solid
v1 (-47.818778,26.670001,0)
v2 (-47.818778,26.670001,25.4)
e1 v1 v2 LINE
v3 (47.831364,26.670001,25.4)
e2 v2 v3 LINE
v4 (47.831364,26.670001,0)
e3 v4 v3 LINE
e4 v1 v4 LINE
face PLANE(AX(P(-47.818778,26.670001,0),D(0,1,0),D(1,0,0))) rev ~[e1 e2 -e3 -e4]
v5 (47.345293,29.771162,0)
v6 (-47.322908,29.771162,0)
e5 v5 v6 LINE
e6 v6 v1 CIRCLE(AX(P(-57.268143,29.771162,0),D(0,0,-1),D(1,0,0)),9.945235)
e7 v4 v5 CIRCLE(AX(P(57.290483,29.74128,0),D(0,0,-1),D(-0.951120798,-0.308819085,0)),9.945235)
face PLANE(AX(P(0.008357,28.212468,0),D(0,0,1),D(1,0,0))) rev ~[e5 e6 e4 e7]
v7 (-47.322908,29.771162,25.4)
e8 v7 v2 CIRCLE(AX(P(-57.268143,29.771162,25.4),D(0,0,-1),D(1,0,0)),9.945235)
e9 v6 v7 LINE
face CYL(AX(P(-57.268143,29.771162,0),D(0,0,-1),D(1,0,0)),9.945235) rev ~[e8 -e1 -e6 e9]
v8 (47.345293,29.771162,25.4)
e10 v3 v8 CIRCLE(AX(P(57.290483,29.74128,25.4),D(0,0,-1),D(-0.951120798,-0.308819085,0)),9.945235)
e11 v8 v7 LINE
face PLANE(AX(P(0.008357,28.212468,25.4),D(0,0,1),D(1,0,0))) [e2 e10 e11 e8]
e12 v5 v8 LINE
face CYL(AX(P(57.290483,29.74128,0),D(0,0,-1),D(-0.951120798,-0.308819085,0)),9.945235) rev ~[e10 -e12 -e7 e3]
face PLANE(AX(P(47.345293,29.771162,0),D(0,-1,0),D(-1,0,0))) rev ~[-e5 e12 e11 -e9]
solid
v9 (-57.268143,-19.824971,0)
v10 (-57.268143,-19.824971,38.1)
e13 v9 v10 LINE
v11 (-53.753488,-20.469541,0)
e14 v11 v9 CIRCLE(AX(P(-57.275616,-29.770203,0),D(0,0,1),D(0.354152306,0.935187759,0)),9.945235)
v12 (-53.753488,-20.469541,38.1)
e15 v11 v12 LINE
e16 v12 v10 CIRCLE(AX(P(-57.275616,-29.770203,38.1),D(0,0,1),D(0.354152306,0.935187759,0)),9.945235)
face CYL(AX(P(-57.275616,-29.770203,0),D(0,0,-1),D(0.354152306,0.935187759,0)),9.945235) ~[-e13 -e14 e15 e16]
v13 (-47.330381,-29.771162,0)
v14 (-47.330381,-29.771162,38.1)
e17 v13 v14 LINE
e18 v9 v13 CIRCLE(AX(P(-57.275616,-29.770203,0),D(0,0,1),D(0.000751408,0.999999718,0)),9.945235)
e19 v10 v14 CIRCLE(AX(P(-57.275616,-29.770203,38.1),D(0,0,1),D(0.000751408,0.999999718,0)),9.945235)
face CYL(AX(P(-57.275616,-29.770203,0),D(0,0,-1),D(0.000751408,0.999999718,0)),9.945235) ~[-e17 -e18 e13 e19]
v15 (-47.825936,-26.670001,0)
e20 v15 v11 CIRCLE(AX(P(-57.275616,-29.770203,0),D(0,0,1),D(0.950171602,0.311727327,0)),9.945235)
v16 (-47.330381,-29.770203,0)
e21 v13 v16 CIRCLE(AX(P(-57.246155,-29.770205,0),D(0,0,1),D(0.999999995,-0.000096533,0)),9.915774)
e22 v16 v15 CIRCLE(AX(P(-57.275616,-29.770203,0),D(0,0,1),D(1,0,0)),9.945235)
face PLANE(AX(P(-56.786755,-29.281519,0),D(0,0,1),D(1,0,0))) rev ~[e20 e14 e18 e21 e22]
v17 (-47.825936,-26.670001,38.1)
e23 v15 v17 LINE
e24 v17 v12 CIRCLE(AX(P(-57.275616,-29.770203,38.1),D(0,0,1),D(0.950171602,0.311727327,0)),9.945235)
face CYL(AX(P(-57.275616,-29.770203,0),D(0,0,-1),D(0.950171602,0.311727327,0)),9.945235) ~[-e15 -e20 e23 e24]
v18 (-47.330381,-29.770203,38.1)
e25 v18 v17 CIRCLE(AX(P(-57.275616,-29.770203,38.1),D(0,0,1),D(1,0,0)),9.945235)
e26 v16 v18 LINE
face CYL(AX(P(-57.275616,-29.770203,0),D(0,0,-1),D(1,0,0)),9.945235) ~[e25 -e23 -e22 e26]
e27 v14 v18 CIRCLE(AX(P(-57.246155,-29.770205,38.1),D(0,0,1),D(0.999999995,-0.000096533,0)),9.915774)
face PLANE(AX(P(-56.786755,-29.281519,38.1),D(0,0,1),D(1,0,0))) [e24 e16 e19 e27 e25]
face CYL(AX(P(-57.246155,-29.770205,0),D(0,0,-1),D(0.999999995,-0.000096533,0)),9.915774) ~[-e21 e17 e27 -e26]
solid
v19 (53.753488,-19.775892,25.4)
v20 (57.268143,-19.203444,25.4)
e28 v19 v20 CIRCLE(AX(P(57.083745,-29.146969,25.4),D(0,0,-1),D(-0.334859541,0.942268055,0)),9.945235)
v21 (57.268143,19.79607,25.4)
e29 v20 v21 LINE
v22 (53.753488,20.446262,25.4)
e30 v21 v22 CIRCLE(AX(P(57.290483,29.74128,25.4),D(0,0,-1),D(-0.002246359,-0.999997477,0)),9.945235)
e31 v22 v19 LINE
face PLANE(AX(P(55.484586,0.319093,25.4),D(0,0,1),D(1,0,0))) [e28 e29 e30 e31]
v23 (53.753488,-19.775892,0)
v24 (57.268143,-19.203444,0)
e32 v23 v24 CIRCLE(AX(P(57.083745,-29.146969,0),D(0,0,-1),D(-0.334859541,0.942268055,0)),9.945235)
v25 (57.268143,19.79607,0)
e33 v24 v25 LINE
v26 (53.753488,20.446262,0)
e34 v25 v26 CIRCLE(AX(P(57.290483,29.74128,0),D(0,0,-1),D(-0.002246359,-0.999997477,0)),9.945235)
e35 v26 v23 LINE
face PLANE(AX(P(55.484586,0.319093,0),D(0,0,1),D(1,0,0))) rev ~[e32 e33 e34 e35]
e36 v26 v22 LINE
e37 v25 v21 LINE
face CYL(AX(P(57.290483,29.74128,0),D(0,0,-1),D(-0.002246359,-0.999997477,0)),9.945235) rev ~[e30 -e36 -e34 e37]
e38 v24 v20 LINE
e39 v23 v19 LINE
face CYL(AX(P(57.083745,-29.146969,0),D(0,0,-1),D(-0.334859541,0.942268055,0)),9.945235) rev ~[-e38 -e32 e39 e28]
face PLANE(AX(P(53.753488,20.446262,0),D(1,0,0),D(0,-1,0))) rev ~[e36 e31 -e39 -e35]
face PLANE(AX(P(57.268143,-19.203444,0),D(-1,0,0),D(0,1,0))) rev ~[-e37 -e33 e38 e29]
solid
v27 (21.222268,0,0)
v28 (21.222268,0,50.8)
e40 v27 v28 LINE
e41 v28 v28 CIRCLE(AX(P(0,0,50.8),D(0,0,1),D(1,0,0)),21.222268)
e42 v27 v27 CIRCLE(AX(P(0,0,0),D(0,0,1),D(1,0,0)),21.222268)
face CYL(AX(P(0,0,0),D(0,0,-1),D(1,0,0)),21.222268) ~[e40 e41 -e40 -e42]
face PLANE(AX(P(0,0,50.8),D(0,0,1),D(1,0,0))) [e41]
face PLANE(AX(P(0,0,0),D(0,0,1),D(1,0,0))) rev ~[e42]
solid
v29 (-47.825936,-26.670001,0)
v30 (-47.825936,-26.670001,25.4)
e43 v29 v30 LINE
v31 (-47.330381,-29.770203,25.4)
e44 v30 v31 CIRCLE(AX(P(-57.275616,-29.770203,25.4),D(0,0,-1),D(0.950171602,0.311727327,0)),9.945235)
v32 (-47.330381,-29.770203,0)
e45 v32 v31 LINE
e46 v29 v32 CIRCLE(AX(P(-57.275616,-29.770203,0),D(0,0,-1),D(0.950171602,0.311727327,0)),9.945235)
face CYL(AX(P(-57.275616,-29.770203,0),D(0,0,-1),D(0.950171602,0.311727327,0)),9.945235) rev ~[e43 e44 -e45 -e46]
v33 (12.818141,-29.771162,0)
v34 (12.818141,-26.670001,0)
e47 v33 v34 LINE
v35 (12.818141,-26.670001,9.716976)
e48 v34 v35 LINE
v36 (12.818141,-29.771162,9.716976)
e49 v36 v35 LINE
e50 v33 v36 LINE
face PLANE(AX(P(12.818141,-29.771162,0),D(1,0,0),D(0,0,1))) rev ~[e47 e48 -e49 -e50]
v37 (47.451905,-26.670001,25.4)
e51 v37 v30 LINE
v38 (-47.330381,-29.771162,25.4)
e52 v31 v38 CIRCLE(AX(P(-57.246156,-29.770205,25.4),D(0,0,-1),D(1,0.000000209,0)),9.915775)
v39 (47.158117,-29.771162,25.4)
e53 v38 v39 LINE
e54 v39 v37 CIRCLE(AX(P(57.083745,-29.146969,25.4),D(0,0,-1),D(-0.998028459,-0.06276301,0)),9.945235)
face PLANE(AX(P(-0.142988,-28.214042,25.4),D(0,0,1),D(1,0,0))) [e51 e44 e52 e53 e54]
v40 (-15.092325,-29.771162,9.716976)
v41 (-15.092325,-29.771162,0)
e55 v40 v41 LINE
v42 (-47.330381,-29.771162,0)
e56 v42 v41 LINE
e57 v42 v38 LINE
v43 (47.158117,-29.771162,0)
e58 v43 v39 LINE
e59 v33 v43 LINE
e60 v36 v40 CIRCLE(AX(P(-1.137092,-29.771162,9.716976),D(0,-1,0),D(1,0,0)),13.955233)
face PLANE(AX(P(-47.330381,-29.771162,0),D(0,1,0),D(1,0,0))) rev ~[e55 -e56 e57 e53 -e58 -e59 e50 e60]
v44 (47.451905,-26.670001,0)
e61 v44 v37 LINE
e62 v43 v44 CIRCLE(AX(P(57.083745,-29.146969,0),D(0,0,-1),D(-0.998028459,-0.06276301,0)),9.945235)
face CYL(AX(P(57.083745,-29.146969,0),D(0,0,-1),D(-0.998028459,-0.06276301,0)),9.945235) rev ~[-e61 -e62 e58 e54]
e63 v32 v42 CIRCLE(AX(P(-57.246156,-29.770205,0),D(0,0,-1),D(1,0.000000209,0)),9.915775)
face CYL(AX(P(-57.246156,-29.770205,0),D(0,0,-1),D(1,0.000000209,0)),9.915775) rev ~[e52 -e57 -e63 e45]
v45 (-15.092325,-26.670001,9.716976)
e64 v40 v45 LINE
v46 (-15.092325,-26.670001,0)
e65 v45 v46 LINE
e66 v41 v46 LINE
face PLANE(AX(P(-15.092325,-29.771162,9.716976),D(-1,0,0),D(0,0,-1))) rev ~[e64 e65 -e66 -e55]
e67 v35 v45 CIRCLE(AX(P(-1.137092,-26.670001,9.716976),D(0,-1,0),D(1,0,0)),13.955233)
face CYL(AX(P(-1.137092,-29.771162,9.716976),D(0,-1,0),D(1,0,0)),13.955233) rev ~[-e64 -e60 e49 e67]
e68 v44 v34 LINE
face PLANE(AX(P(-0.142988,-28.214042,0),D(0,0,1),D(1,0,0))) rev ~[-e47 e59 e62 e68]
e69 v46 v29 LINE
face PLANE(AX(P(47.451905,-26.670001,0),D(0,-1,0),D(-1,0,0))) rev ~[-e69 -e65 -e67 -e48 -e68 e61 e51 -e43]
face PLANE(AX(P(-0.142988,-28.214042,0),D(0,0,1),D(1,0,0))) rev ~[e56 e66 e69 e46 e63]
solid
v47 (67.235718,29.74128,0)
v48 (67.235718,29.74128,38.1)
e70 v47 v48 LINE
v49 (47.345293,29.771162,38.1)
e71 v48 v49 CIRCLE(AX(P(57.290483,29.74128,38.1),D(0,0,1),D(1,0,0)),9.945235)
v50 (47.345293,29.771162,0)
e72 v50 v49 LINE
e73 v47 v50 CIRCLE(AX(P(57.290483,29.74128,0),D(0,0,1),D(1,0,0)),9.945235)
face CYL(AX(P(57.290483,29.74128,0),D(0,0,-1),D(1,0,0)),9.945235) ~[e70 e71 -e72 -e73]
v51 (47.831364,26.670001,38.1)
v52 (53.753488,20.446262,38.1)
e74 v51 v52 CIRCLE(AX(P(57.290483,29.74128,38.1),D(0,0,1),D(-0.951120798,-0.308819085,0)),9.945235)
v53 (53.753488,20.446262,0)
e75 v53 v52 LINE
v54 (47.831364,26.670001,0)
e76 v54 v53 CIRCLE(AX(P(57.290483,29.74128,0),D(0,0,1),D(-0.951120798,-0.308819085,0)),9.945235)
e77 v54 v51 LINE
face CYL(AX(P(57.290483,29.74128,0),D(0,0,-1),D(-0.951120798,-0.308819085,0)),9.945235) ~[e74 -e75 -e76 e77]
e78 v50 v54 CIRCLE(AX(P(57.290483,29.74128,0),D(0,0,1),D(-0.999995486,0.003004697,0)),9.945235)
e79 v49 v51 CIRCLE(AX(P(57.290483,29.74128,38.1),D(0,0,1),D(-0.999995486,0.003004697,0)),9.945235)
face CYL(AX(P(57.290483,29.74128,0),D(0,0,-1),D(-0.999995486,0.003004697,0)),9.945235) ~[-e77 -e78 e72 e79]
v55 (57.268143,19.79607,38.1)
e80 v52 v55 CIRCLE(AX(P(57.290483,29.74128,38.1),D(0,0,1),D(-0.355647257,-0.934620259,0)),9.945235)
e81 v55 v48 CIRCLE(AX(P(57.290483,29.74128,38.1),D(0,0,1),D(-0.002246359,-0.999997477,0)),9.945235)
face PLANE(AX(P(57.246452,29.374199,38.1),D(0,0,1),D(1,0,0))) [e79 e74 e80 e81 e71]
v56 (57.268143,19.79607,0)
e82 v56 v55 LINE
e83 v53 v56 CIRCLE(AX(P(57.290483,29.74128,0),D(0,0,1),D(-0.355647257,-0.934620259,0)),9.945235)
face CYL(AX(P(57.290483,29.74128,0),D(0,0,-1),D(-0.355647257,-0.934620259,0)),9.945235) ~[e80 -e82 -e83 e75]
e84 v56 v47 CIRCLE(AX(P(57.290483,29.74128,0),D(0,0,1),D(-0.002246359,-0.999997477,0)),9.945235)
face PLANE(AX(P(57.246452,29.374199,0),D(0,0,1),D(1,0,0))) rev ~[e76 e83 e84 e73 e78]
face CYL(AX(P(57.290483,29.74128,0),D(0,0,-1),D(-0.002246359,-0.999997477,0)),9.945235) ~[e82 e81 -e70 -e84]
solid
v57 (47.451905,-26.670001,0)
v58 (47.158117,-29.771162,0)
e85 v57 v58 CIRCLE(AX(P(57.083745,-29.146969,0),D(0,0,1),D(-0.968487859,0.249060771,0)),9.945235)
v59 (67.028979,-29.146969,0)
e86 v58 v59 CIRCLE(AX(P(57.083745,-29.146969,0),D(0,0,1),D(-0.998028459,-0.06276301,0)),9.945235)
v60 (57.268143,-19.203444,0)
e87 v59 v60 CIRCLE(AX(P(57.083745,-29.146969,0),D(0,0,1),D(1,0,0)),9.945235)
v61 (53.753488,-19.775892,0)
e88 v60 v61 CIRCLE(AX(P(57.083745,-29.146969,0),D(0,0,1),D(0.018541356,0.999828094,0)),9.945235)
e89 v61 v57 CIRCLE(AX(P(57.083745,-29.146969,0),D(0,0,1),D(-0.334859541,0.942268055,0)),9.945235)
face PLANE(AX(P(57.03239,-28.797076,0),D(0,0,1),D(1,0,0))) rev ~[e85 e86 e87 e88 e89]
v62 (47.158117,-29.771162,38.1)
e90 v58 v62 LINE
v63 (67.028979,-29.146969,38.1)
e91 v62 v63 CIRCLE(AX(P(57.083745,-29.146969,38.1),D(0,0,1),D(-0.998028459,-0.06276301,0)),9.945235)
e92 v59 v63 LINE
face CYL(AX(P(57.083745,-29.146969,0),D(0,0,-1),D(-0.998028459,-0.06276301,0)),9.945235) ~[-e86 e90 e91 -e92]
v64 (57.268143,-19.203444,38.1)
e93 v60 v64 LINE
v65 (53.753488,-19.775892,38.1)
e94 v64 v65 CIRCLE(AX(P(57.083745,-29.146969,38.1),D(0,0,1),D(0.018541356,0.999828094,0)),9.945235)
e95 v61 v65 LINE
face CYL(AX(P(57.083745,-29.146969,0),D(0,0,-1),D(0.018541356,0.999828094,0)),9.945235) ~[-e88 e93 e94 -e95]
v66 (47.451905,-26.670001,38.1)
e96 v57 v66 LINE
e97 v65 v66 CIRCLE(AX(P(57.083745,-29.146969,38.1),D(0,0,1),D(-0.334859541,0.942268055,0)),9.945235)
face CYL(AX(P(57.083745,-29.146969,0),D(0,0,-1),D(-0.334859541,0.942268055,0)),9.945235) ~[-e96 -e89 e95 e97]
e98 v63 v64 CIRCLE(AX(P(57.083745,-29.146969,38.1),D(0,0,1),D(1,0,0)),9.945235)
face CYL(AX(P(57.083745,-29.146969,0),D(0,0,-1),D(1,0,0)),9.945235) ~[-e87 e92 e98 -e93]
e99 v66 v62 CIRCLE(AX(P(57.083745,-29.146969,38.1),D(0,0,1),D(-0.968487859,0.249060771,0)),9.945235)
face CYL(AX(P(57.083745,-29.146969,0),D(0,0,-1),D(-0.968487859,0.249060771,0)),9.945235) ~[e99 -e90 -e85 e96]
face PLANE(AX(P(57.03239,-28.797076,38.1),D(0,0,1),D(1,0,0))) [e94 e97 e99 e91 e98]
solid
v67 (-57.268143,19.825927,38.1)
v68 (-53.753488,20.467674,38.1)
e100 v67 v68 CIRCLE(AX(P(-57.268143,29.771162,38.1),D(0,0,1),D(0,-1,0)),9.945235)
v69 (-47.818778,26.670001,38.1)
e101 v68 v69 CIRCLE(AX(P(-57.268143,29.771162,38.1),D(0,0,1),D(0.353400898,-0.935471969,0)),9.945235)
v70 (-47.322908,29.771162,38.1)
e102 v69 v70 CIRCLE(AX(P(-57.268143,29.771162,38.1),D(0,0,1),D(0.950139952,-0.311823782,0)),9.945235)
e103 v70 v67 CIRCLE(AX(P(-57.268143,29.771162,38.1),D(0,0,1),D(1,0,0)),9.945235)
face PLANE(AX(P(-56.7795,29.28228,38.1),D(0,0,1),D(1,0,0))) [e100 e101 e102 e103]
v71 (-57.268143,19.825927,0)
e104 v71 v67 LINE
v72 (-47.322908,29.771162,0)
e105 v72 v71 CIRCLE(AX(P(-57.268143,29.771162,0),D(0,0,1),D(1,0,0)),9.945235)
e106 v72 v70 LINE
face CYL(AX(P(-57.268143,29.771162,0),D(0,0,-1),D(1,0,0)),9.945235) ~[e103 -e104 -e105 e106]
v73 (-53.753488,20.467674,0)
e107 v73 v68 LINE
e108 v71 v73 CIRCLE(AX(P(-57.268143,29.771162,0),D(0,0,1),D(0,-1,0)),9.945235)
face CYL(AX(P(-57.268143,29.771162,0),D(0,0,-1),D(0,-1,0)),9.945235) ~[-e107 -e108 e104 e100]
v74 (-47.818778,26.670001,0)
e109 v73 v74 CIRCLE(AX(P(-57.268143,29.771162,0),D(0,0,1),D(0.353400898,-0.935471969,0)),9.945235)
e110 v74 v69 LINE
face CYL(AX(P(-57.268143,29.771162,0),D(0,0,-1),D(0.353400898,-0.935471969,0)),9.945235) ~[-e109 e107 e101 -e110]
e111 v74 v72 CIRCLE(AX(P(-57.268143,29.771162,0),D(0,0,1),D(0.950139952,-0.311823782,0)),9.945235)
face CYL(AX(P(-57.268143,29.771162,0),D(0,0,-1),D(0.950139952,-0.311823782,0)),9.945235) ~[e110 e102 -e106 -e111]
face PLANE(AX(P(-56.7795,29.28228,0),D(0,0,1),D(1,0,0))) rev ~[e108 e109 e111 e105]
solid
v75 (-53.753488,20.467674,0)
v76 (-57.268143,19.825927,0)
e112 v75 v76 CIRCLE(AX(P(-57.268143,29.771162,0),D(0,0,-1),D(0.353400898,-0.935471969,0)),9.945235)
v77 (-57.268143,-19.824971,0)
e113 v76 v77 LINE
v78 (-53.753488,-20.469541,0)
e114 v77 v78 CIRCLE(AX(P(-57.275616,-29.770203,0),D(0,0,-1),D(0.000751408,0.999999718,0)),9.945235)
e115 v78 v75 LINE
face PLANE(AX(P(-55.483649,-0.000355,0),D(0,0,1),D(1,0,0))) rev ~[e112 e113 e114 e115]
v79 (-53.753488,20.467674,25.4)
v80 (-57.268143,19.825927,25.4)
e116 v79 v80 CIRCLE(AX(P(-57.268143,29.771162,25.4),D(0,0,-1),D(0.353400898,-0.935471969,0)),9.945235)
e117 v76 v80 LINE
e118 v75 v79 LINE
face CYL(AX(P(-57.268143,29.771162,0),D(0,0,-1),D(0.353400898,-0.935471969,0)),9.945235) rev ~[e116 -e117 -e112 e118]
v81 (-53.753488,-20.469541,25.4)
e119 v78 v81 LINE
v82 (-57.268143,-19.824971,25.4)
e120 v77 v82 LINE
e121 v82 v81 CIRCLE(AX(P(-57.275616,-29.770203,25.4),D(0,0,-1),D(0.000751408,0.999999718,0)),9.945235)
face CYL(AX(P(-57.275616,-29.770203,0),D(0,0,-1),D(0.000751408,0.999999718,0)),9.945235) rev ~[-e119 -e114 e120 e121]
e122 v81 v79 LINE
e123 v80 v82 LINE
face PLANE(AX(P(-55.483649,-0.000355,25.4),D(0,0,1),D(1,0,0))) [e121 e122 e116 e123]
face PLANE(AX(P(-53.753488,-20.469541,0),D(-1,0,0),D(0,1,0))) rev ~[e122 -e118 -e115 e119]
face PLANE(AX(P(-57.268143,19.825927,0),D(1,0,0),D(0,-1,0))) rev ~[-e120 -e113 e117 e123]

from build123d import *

# Parameters (mm, degrees)
F1_DEPTH = 25.4
F2_DEPTH = 38.1
F0_R     = 21.2222684157
F3_DEPTH = 50.8
F5_DEPTH = 25.4


# Not quite as in the source:
# - a feature of the source that left no trace in its solid (it failed there, or was rolled back) is left out


with BuildPart() as f1:
    # F0 (on Top) → F1 (new body)
    with BuildSketch(Plane.XY):
        with BuildLine():
            Line((57.2681427002, -19.2034440821), (57.2681427002, 19.7960699943))
            ThreePointArc((57.2681427002, 19.7960699943), (55.4813658991, 19.9619755545), (53.7534877658, 20.4462617803))
            Line((53.7534877658, 20.4462617803), (53.7534877658, -19.7758921918))
            ThreePointArc((53.7534877658, -19.7758921918), (55.4849853919, -19.3310808749), (57.2681427002, -19.2034440821))
        make_face()
    extrude(amount=F1_DEPTH)


with BuildPart() as f1b:
    # F0 (on Top) → F1, piece 2 (new body)
    with BuildSketch(Plane.XY):
        with BuildLine():
            ThreePointArc((-47.3303807535, -29.7702029347), (-47.330380765, -29.7706825659), (-47.3303807997, -29.771162197))
            Line((-47.3303807997, -29.771162197), (47.1581171171, -29.771162197))
            ThreePointArc((47.1581171171, -29.771162197), (47.1828392876, -28.209007874), (47.4519053251, -26.6700014472))
            Line((47.4519053251, -26.6700014472), (-47.8259358741, -26.6700014472))
            ThreePointArc((-47.8259358741, -26.6700014472), (-47.4550509459, -28.2004239582), (-47.3303807535, -29.7702029347))
        make_face()
    extrude(amount=F1_DEPTH)

    # F4 (on face) → F5 (cut)
    with BuildSketch(Plane.XZ.offset(29.771162197)):
        with BuildLine():
            Line((-15.0923253968, 0), (0, 0))
            Line((0, 0), (12.8181409091, 0))
            Line((12.8181409091, 0), (12.8181409091, 9.716976434))
            ThreePointArc((12.8181409091, 9.716976434), (-1.1370922439, 23.6722095869), (-15.0923253968, 9.716976434))
            Line((-15.0923253968, 9.716976434), (-15.0923253968, 0))
        make_face()
    extrude(amount=-F5_DEPTH, mode=Mode.SUBTRACT)


with BuildPart() as f1c:
    # F0 (on Top) → F1, piece 3 (new body)
    with BuildSketch(Plane.XY):
        with BuildLine():
            ThreePointArc((-53.7534877658, 20.4676737388), (-55.4817610377, 19.9876793123), (-57.2681427002, 19.8259273179))
            Line((-57.2681427002, 19.8259273179), (-57.2681427002, -19.8249708633))
            ThreePointArc((-57.2681427002, -19.8249708633), (-55.4816289767, -19.9881117126), (-53.7534877658, -20.469541018))
            Line((-53.7534877658, -20.469541018), (-53.7534877658, 20.4676737388))
        make_face()
    extrude(amount=F1_DEPTH)


with BuildPart() as f1d:
    # F0 (on Top) → F1, piece 4 (new body)
    with BuildSketch(Plane.XY):
        with BuildLine():
            ThreePointArc((47.8313635292, 26.6700014472), (47.4652042143, 28.2012835622), (47.345293281, 29.771162197))
            Line((47.345293281, 29.771162197), (-47.3229078211, 29.771162197))
            ThreePointArc((-47.3229078211, 29.771162197), (-47.4476577038, 28.2008847583), (-47.8187777055, 26.6700014472))
            Line((-47.8187777055, 26.6700014472), (47.8313635292, 26.6700014472))
        make_face()
    extrude(amount=F1_DEPTH)


with BuildPart() as f2:
    # F0 (on Top) → F2 (new body)
    with BuildSketch(Plane.XY):
        with BuildLine():
            ThreePointArc((67.2357181452, 29.7412797809), (57.305424491, 39.6865034364), (47.345293281, 29.771162197))
            ThreePointArc((47.345293281, 29.771162197), (47.4652042143, 28.2012835622), (47.8313635292, 26.6700014472))
            ThreePointArc((47.8313635292, 26.6700014472), (50.0857288168, 22.8856827883), (53.7534877658, 20.4462617803))
            ThreePointArc((53.7534877658, 20.4462617803), (55.4813658991, 19.9619755545), (57.2681427002, 19.7960699943))
            ThreePointArc((57.2681427002, 19.7960699943), (64.314923266, 22.7010426053), (67.2357181452, 29.7412797809))
        make_face()
    extrude(amount=F2_DEPTH)


with BuildPart() as f2b:
    # F0 (on Top) → F2, piece 2 (new body)
    with BuildSketch(Plane.XY):
        with BuildLine():
            ThreePointArc((67.0289794348, -29.1469693184), (64.1809827389, -22.1801259176), (57.2681427002, -19.2034440821))
            ThreePointArc((57.2681427002, -19.2034440821), (55.4849853919, -19.3310808749), (53.7534877658, -19.7758921918))
            ThreePointArc((53.7534877658, -19.7758921918), (49.7430246375, -22.4371609842), (47.4519053251, -26.6700014472))
            ThreePointArc((47.4519053251, -26.6700014472), (47.1828392876, -28.209007874), (47.1581171171, -29.771162197))
            ThreePointArc((47.1581171171, -29.771162197), (57.3959949366, -39.0873011287), (67.0289794348, -29.1469693184))
        make_face()
    extrude(amount=F2_DEPTH)


with BuildPart() as f2c:
    # F0 (on Top) → F2, piece 3 (new body)
    with BuildSketch(Plane.XY):
        with BuildLine():
            ThreePointArc((-53.7534877658, -20.469541018), (-55.4816289767, -19.9881117126), (-57.2681427002, -19.8249708633))
            ThreePointArc((-57.2681427002, -19.8249708633), (-64.3109392552, -36.7995640952), (-47.3303807997, -29.771162197))
            ThreePointArc((-47.3303807997, -29.771162197), (-47.330380765, -29.7706825659), (-47.3303807535, -29.7702029347))
            ThreePointArc((-47.3303807535, -29.7702029347), (-47.4550509459, -28.2004239582), (-47.8259358741, -26.6700014472))
            ThreePointArc((-47.8259358741, -26.6700014472), (-50.0868483078, -22.8978437219), (-53.7534877658, -20.469541018))
        make_face()
    extrude(amount=F2_DEPTH)


with BuildPart() as f2d:
    # F0 (on Top) → F2, piece 4 (new body)
    with BuildSketch(Plane.XY):
        with BuildLine():
            ThreePointArc((-47.8187777055, 26.6700014472), (-47.4476577038, 28.2008847583), (-47.3229078211, 29.771162197))
            ThreePointArc((-47.3229078211, 29.771162197), (-64.3004857237, 36.8035052205), (-57.2681427002, 19.8259273179))
            ThreePointArc((-57.2681427002, 19.8259273179), (-55.4817610377, 19.9876793123), (-53.7534877658, 20.4676737388))
            ThreePointArc((-53.7534877658, 20.4676737388), (-50.0824854281, 22.8955512155), (-47.8187777055, 26.6700014472))
        make_face()
    extrude(amount=F2_DEPTH)


with BuildPart() as f3:
    # F0 (on Top) → F3 (new body)
    with BuildSketch(Plane.XY):
        Circle(F0_R)
    extrude(amount=F3_DEPTH)


solid = Compound([f1.part, f1b.part, f1c.part, f1d.part, f2.part, f2b.part, f2c.part, f2d.part, f3.part])
